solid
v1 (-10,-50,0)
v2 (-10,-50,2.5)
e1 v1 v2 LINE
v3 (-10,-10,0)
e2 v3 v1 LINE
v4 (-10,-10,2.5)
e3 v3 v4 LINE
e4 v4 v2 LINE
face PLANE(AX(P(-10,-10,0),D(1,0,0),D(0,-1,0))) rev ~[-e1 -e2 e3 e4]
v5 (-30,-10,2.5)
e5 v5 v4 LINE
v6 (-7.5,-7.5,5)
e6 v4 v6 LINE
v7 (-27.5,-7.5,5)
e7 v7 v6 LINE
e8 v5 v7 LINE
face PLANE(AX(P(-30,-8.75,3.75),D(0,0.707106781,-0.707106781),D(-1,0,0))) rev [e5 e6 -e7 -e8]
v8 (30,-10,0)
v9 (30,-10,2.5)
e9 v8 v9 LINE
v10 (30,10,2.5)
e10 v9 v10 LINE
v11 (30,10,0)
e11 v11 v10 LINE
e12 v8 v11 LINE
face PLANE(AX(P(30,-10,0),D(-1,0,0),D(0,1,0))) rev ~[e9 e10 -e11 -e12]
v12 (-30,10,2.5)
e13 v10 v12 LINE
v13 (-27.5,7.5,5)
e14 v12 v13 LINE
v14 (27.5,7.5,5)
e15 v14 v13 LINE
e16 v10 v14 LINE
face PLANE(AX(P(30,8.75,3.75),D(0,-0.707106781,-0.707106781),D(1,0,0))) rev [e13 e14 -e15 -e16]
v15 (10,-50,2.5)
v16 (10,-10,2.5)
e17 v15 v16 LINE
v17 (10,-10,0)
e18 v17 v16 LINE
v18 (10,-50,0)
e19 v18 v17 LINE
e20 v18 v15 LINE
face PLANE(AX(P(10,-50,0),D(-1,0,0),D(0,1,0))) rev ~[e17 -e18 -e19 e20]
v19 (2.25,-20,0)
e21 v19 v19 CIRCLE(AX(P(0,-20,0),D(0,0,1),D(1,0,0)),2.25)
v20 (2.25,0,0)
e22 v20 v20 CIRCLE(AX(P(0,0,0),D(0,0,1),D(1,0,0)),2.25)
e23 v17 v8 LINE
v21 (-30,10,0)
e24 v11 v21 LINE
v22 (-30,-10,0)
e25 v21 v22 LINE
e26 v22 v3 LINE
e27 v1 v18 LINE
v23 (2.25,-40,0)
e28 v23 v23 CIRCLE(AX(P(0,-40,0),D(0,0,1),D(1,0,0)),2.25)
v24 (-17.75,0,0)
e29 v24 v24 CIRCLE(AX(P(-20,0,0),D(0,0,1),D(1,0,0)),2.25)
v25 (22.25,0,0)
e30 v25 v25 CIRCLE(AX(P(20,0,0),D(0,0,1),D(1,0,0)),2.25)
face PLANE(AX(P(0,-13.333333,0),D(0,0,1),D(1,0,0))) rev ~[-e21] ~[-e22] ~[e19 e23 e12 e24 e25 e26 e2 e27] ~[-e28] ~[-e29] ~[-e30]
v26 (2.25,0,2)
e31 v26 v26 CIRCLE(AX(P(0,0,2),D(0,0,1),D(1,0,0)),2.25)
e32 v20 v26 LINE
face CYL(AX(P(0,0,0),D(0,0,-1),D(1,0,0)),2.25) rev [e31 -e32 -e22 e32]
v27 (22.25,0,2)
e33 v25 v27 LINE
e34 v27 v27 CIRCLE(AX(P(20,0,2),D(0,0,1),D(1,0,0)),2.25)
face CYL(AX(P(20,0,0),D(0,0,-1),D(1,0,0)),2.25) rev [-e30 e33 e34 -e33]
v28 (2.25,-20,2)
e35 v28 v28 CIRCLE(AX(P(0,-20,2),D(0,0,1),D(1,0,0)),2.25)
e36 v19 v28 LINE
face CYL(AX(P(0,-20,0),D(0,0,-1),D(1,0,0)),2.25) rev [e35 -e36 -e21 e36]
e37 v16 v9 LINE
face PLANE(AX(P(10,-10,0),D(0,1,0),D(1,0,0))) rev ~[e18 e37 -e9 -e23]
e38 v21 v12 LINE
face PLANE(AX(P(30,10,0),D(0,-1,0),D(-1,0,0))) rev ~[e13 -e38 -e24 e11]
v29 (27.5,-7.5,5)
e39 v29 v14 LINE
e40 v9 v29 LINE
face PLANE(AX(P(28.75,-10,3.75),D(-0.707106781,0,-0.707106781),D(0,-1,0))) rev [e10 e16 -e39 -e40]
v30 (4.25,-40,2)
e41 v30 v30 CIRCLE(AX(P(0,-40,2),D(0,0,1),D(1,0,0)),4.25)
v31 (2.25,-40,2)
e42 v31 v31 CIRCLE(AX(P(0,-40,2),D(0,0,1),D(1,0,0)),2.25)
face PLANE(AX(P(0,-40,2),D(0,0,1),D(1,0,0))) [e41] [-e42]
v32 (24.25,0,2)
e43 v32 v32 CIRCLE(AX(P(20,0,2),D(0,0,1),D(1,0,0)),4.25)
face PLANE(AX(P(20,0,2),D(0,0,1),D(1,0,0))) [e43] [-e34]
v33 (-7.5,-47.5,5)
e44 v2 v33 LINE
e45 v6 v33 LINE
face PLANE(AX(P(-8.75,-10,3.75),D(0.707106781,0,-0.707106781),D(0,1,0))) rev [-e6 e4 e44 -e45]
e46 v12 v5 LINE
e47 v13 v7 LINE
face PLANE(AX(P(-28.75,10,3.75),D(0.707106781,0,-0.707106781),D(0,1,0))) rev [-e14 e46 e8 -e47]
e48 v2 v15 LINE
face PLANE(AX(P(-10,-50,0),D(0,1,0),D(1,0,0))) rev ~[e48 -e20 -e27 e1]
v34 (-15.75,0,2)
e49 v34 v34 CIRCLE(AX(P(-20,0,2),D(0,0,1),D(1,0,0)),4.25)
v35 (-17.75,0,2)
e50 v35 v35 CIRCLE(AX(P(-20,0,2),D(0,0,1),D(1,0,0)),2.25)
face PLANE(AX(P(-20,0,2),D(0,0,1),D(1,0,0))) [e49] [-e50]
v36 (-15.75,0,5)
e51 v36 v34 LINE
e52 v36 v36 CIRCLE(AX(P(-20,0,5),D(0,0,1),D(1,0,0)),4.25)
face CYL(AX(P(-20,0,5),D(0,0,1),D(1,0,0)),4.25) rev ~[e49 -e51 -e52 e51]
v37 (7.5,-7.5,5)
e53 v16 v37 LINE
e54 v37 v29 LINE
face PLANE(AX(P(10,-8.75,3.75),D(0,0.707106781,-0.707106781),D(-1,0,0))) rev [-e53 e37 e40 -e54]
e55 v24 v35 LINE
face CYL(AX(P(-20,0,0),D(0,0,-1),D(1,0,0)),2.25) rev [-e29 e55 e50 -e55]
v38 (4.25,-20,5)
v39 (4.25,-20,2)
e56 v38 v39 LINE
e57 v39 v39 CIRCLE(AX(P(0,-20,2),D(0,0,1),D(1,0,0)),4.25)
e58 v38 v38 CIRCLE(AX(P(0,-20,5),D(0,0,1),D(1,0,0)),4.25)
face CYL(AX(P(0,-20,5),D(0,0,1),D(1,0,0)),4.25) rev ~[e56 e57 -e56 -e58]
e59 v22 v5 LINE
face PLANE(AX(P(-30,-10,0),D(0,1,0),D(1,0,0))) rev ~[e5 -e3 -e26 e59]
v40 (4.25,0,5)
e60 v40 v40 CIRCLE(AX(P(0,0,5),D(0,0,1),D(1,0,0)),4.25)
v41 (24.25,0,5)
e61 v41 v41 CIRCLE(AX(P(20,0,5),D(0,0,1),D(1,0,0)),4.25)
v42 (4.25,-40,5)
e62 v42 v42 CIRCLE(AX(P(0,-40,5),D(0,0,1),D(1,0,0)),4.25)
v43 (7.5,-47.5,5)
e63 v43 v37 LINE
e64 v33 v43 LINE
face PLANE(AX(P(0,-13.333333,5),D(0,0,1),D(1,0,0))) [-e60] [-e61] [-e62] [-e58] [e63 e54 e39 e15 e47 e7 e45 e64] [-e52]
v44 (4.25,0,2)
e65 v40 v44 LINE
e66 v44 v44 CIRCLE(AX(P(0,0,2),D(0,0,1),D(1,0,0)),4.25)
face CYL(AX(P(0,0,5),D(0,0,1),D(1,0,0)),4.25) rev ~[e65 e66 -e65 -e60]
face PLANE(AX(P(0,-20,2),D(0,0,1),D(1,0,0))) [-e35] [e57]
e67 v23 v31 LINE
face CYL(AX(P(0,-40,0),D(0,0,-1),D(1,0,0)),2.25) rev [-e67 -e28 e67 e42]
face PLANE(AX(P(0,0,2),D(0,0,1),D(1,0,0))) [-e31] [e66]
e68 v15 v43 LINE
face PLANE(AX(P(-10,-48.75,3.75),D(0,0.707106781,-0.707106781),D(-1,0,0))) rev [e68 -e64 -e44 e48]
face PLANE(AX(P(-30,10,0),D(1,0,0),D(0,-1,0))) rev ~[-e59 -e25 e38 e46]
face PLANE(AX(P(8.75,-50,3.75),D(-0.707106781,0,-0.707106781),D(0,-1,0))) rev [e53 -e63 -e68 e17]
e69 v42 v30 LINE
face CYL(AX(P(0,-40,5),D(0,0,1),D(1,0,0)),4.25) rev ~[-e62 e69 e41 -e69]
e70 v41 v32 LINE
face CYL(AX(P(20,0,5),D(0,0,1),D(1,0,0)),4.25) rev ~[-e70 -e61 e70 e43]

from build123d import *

# Parameters (mm, degrees)
F0_R     = 2.25
F1_DEPTH = 5
F2_SIZE  = 2.5
F3_R     = 4.25
F3_R_2   = 2.25
F4_DEPTH = 3


with BuildPart() as f1:
    # F0 (on Top) → F1 (new body)
    with BuildSketch(Plane.XY):
        Polygon((-10, -50), (0, -50), (10, -50), (10, -10), (30, -10), (30, 10), (0, 10), (-30, 10), (-30, -10), (-10, -10), align=None)
        with Locations((0, -40)):
            Circle(F0_R, mode=Mode.SUBTRACT)
        with Locations((-20, 0)):
            Circle(F0_R, mode=Mode.SUBTRACT)
        with Locations((0, -20)):
            Circle(F0_R, mode=Mode.SUBTRACT)
        Circle(F0_R, mode=Mode.SUBTRACT)
        with Locations((20, 0)):
            Circle(F0_R, mode=Mode.SUBTRACT)
    extrude(amount=F1_DEPTH)

    # F2
    f2_edges = [f1.edges().sort_by_distance(p)[0] for p in [
        (0, -50, 5),
        (10, -30, 5),
        (20, -10, 5),
        (30, 0, 5),
        (0, 10, 5),
        (-30, 0, 5),
        (-20, -10, 5),
        (-10, -30, 5),
    ]]
    chamfer(f2_edges, length=F2_SIZE)

    # F3 (on face) → F4 (cut)
    with BuildSketch(Plane.XY.offset(5)):
        with Locations((-20, 0)):
            Circle(F3_R)
        with Locations((-20, 0)):
            Circle(F3_R_2, mode=Mode.SUBTRACT)
        Circle(F3_R)
        Circle(F3_R_2, mode=Mode.SUBTRACT)
        with Locations((20, 0)):
            Circle(F3_R)
        with Locations((20, 0)):
            Circle(F3_R_2, mode=Mode.SUBTRACT)
        with Locations((0, -20)):
            Circle(F3_R)
        with Locations((0, -20)):
            Circle(F3_R_2, mode=Mode.SUBTRACT)
        with Locations((0, -40)):
            Circle(F3_R)
        with Locations((0, -40)):
            Circle(F3_R_2, mode=Mode.SUBTRACT)
    extrude(amount=-F4_DEPTH, mode=Mode.SUBTRACT)


solid = f1.part
